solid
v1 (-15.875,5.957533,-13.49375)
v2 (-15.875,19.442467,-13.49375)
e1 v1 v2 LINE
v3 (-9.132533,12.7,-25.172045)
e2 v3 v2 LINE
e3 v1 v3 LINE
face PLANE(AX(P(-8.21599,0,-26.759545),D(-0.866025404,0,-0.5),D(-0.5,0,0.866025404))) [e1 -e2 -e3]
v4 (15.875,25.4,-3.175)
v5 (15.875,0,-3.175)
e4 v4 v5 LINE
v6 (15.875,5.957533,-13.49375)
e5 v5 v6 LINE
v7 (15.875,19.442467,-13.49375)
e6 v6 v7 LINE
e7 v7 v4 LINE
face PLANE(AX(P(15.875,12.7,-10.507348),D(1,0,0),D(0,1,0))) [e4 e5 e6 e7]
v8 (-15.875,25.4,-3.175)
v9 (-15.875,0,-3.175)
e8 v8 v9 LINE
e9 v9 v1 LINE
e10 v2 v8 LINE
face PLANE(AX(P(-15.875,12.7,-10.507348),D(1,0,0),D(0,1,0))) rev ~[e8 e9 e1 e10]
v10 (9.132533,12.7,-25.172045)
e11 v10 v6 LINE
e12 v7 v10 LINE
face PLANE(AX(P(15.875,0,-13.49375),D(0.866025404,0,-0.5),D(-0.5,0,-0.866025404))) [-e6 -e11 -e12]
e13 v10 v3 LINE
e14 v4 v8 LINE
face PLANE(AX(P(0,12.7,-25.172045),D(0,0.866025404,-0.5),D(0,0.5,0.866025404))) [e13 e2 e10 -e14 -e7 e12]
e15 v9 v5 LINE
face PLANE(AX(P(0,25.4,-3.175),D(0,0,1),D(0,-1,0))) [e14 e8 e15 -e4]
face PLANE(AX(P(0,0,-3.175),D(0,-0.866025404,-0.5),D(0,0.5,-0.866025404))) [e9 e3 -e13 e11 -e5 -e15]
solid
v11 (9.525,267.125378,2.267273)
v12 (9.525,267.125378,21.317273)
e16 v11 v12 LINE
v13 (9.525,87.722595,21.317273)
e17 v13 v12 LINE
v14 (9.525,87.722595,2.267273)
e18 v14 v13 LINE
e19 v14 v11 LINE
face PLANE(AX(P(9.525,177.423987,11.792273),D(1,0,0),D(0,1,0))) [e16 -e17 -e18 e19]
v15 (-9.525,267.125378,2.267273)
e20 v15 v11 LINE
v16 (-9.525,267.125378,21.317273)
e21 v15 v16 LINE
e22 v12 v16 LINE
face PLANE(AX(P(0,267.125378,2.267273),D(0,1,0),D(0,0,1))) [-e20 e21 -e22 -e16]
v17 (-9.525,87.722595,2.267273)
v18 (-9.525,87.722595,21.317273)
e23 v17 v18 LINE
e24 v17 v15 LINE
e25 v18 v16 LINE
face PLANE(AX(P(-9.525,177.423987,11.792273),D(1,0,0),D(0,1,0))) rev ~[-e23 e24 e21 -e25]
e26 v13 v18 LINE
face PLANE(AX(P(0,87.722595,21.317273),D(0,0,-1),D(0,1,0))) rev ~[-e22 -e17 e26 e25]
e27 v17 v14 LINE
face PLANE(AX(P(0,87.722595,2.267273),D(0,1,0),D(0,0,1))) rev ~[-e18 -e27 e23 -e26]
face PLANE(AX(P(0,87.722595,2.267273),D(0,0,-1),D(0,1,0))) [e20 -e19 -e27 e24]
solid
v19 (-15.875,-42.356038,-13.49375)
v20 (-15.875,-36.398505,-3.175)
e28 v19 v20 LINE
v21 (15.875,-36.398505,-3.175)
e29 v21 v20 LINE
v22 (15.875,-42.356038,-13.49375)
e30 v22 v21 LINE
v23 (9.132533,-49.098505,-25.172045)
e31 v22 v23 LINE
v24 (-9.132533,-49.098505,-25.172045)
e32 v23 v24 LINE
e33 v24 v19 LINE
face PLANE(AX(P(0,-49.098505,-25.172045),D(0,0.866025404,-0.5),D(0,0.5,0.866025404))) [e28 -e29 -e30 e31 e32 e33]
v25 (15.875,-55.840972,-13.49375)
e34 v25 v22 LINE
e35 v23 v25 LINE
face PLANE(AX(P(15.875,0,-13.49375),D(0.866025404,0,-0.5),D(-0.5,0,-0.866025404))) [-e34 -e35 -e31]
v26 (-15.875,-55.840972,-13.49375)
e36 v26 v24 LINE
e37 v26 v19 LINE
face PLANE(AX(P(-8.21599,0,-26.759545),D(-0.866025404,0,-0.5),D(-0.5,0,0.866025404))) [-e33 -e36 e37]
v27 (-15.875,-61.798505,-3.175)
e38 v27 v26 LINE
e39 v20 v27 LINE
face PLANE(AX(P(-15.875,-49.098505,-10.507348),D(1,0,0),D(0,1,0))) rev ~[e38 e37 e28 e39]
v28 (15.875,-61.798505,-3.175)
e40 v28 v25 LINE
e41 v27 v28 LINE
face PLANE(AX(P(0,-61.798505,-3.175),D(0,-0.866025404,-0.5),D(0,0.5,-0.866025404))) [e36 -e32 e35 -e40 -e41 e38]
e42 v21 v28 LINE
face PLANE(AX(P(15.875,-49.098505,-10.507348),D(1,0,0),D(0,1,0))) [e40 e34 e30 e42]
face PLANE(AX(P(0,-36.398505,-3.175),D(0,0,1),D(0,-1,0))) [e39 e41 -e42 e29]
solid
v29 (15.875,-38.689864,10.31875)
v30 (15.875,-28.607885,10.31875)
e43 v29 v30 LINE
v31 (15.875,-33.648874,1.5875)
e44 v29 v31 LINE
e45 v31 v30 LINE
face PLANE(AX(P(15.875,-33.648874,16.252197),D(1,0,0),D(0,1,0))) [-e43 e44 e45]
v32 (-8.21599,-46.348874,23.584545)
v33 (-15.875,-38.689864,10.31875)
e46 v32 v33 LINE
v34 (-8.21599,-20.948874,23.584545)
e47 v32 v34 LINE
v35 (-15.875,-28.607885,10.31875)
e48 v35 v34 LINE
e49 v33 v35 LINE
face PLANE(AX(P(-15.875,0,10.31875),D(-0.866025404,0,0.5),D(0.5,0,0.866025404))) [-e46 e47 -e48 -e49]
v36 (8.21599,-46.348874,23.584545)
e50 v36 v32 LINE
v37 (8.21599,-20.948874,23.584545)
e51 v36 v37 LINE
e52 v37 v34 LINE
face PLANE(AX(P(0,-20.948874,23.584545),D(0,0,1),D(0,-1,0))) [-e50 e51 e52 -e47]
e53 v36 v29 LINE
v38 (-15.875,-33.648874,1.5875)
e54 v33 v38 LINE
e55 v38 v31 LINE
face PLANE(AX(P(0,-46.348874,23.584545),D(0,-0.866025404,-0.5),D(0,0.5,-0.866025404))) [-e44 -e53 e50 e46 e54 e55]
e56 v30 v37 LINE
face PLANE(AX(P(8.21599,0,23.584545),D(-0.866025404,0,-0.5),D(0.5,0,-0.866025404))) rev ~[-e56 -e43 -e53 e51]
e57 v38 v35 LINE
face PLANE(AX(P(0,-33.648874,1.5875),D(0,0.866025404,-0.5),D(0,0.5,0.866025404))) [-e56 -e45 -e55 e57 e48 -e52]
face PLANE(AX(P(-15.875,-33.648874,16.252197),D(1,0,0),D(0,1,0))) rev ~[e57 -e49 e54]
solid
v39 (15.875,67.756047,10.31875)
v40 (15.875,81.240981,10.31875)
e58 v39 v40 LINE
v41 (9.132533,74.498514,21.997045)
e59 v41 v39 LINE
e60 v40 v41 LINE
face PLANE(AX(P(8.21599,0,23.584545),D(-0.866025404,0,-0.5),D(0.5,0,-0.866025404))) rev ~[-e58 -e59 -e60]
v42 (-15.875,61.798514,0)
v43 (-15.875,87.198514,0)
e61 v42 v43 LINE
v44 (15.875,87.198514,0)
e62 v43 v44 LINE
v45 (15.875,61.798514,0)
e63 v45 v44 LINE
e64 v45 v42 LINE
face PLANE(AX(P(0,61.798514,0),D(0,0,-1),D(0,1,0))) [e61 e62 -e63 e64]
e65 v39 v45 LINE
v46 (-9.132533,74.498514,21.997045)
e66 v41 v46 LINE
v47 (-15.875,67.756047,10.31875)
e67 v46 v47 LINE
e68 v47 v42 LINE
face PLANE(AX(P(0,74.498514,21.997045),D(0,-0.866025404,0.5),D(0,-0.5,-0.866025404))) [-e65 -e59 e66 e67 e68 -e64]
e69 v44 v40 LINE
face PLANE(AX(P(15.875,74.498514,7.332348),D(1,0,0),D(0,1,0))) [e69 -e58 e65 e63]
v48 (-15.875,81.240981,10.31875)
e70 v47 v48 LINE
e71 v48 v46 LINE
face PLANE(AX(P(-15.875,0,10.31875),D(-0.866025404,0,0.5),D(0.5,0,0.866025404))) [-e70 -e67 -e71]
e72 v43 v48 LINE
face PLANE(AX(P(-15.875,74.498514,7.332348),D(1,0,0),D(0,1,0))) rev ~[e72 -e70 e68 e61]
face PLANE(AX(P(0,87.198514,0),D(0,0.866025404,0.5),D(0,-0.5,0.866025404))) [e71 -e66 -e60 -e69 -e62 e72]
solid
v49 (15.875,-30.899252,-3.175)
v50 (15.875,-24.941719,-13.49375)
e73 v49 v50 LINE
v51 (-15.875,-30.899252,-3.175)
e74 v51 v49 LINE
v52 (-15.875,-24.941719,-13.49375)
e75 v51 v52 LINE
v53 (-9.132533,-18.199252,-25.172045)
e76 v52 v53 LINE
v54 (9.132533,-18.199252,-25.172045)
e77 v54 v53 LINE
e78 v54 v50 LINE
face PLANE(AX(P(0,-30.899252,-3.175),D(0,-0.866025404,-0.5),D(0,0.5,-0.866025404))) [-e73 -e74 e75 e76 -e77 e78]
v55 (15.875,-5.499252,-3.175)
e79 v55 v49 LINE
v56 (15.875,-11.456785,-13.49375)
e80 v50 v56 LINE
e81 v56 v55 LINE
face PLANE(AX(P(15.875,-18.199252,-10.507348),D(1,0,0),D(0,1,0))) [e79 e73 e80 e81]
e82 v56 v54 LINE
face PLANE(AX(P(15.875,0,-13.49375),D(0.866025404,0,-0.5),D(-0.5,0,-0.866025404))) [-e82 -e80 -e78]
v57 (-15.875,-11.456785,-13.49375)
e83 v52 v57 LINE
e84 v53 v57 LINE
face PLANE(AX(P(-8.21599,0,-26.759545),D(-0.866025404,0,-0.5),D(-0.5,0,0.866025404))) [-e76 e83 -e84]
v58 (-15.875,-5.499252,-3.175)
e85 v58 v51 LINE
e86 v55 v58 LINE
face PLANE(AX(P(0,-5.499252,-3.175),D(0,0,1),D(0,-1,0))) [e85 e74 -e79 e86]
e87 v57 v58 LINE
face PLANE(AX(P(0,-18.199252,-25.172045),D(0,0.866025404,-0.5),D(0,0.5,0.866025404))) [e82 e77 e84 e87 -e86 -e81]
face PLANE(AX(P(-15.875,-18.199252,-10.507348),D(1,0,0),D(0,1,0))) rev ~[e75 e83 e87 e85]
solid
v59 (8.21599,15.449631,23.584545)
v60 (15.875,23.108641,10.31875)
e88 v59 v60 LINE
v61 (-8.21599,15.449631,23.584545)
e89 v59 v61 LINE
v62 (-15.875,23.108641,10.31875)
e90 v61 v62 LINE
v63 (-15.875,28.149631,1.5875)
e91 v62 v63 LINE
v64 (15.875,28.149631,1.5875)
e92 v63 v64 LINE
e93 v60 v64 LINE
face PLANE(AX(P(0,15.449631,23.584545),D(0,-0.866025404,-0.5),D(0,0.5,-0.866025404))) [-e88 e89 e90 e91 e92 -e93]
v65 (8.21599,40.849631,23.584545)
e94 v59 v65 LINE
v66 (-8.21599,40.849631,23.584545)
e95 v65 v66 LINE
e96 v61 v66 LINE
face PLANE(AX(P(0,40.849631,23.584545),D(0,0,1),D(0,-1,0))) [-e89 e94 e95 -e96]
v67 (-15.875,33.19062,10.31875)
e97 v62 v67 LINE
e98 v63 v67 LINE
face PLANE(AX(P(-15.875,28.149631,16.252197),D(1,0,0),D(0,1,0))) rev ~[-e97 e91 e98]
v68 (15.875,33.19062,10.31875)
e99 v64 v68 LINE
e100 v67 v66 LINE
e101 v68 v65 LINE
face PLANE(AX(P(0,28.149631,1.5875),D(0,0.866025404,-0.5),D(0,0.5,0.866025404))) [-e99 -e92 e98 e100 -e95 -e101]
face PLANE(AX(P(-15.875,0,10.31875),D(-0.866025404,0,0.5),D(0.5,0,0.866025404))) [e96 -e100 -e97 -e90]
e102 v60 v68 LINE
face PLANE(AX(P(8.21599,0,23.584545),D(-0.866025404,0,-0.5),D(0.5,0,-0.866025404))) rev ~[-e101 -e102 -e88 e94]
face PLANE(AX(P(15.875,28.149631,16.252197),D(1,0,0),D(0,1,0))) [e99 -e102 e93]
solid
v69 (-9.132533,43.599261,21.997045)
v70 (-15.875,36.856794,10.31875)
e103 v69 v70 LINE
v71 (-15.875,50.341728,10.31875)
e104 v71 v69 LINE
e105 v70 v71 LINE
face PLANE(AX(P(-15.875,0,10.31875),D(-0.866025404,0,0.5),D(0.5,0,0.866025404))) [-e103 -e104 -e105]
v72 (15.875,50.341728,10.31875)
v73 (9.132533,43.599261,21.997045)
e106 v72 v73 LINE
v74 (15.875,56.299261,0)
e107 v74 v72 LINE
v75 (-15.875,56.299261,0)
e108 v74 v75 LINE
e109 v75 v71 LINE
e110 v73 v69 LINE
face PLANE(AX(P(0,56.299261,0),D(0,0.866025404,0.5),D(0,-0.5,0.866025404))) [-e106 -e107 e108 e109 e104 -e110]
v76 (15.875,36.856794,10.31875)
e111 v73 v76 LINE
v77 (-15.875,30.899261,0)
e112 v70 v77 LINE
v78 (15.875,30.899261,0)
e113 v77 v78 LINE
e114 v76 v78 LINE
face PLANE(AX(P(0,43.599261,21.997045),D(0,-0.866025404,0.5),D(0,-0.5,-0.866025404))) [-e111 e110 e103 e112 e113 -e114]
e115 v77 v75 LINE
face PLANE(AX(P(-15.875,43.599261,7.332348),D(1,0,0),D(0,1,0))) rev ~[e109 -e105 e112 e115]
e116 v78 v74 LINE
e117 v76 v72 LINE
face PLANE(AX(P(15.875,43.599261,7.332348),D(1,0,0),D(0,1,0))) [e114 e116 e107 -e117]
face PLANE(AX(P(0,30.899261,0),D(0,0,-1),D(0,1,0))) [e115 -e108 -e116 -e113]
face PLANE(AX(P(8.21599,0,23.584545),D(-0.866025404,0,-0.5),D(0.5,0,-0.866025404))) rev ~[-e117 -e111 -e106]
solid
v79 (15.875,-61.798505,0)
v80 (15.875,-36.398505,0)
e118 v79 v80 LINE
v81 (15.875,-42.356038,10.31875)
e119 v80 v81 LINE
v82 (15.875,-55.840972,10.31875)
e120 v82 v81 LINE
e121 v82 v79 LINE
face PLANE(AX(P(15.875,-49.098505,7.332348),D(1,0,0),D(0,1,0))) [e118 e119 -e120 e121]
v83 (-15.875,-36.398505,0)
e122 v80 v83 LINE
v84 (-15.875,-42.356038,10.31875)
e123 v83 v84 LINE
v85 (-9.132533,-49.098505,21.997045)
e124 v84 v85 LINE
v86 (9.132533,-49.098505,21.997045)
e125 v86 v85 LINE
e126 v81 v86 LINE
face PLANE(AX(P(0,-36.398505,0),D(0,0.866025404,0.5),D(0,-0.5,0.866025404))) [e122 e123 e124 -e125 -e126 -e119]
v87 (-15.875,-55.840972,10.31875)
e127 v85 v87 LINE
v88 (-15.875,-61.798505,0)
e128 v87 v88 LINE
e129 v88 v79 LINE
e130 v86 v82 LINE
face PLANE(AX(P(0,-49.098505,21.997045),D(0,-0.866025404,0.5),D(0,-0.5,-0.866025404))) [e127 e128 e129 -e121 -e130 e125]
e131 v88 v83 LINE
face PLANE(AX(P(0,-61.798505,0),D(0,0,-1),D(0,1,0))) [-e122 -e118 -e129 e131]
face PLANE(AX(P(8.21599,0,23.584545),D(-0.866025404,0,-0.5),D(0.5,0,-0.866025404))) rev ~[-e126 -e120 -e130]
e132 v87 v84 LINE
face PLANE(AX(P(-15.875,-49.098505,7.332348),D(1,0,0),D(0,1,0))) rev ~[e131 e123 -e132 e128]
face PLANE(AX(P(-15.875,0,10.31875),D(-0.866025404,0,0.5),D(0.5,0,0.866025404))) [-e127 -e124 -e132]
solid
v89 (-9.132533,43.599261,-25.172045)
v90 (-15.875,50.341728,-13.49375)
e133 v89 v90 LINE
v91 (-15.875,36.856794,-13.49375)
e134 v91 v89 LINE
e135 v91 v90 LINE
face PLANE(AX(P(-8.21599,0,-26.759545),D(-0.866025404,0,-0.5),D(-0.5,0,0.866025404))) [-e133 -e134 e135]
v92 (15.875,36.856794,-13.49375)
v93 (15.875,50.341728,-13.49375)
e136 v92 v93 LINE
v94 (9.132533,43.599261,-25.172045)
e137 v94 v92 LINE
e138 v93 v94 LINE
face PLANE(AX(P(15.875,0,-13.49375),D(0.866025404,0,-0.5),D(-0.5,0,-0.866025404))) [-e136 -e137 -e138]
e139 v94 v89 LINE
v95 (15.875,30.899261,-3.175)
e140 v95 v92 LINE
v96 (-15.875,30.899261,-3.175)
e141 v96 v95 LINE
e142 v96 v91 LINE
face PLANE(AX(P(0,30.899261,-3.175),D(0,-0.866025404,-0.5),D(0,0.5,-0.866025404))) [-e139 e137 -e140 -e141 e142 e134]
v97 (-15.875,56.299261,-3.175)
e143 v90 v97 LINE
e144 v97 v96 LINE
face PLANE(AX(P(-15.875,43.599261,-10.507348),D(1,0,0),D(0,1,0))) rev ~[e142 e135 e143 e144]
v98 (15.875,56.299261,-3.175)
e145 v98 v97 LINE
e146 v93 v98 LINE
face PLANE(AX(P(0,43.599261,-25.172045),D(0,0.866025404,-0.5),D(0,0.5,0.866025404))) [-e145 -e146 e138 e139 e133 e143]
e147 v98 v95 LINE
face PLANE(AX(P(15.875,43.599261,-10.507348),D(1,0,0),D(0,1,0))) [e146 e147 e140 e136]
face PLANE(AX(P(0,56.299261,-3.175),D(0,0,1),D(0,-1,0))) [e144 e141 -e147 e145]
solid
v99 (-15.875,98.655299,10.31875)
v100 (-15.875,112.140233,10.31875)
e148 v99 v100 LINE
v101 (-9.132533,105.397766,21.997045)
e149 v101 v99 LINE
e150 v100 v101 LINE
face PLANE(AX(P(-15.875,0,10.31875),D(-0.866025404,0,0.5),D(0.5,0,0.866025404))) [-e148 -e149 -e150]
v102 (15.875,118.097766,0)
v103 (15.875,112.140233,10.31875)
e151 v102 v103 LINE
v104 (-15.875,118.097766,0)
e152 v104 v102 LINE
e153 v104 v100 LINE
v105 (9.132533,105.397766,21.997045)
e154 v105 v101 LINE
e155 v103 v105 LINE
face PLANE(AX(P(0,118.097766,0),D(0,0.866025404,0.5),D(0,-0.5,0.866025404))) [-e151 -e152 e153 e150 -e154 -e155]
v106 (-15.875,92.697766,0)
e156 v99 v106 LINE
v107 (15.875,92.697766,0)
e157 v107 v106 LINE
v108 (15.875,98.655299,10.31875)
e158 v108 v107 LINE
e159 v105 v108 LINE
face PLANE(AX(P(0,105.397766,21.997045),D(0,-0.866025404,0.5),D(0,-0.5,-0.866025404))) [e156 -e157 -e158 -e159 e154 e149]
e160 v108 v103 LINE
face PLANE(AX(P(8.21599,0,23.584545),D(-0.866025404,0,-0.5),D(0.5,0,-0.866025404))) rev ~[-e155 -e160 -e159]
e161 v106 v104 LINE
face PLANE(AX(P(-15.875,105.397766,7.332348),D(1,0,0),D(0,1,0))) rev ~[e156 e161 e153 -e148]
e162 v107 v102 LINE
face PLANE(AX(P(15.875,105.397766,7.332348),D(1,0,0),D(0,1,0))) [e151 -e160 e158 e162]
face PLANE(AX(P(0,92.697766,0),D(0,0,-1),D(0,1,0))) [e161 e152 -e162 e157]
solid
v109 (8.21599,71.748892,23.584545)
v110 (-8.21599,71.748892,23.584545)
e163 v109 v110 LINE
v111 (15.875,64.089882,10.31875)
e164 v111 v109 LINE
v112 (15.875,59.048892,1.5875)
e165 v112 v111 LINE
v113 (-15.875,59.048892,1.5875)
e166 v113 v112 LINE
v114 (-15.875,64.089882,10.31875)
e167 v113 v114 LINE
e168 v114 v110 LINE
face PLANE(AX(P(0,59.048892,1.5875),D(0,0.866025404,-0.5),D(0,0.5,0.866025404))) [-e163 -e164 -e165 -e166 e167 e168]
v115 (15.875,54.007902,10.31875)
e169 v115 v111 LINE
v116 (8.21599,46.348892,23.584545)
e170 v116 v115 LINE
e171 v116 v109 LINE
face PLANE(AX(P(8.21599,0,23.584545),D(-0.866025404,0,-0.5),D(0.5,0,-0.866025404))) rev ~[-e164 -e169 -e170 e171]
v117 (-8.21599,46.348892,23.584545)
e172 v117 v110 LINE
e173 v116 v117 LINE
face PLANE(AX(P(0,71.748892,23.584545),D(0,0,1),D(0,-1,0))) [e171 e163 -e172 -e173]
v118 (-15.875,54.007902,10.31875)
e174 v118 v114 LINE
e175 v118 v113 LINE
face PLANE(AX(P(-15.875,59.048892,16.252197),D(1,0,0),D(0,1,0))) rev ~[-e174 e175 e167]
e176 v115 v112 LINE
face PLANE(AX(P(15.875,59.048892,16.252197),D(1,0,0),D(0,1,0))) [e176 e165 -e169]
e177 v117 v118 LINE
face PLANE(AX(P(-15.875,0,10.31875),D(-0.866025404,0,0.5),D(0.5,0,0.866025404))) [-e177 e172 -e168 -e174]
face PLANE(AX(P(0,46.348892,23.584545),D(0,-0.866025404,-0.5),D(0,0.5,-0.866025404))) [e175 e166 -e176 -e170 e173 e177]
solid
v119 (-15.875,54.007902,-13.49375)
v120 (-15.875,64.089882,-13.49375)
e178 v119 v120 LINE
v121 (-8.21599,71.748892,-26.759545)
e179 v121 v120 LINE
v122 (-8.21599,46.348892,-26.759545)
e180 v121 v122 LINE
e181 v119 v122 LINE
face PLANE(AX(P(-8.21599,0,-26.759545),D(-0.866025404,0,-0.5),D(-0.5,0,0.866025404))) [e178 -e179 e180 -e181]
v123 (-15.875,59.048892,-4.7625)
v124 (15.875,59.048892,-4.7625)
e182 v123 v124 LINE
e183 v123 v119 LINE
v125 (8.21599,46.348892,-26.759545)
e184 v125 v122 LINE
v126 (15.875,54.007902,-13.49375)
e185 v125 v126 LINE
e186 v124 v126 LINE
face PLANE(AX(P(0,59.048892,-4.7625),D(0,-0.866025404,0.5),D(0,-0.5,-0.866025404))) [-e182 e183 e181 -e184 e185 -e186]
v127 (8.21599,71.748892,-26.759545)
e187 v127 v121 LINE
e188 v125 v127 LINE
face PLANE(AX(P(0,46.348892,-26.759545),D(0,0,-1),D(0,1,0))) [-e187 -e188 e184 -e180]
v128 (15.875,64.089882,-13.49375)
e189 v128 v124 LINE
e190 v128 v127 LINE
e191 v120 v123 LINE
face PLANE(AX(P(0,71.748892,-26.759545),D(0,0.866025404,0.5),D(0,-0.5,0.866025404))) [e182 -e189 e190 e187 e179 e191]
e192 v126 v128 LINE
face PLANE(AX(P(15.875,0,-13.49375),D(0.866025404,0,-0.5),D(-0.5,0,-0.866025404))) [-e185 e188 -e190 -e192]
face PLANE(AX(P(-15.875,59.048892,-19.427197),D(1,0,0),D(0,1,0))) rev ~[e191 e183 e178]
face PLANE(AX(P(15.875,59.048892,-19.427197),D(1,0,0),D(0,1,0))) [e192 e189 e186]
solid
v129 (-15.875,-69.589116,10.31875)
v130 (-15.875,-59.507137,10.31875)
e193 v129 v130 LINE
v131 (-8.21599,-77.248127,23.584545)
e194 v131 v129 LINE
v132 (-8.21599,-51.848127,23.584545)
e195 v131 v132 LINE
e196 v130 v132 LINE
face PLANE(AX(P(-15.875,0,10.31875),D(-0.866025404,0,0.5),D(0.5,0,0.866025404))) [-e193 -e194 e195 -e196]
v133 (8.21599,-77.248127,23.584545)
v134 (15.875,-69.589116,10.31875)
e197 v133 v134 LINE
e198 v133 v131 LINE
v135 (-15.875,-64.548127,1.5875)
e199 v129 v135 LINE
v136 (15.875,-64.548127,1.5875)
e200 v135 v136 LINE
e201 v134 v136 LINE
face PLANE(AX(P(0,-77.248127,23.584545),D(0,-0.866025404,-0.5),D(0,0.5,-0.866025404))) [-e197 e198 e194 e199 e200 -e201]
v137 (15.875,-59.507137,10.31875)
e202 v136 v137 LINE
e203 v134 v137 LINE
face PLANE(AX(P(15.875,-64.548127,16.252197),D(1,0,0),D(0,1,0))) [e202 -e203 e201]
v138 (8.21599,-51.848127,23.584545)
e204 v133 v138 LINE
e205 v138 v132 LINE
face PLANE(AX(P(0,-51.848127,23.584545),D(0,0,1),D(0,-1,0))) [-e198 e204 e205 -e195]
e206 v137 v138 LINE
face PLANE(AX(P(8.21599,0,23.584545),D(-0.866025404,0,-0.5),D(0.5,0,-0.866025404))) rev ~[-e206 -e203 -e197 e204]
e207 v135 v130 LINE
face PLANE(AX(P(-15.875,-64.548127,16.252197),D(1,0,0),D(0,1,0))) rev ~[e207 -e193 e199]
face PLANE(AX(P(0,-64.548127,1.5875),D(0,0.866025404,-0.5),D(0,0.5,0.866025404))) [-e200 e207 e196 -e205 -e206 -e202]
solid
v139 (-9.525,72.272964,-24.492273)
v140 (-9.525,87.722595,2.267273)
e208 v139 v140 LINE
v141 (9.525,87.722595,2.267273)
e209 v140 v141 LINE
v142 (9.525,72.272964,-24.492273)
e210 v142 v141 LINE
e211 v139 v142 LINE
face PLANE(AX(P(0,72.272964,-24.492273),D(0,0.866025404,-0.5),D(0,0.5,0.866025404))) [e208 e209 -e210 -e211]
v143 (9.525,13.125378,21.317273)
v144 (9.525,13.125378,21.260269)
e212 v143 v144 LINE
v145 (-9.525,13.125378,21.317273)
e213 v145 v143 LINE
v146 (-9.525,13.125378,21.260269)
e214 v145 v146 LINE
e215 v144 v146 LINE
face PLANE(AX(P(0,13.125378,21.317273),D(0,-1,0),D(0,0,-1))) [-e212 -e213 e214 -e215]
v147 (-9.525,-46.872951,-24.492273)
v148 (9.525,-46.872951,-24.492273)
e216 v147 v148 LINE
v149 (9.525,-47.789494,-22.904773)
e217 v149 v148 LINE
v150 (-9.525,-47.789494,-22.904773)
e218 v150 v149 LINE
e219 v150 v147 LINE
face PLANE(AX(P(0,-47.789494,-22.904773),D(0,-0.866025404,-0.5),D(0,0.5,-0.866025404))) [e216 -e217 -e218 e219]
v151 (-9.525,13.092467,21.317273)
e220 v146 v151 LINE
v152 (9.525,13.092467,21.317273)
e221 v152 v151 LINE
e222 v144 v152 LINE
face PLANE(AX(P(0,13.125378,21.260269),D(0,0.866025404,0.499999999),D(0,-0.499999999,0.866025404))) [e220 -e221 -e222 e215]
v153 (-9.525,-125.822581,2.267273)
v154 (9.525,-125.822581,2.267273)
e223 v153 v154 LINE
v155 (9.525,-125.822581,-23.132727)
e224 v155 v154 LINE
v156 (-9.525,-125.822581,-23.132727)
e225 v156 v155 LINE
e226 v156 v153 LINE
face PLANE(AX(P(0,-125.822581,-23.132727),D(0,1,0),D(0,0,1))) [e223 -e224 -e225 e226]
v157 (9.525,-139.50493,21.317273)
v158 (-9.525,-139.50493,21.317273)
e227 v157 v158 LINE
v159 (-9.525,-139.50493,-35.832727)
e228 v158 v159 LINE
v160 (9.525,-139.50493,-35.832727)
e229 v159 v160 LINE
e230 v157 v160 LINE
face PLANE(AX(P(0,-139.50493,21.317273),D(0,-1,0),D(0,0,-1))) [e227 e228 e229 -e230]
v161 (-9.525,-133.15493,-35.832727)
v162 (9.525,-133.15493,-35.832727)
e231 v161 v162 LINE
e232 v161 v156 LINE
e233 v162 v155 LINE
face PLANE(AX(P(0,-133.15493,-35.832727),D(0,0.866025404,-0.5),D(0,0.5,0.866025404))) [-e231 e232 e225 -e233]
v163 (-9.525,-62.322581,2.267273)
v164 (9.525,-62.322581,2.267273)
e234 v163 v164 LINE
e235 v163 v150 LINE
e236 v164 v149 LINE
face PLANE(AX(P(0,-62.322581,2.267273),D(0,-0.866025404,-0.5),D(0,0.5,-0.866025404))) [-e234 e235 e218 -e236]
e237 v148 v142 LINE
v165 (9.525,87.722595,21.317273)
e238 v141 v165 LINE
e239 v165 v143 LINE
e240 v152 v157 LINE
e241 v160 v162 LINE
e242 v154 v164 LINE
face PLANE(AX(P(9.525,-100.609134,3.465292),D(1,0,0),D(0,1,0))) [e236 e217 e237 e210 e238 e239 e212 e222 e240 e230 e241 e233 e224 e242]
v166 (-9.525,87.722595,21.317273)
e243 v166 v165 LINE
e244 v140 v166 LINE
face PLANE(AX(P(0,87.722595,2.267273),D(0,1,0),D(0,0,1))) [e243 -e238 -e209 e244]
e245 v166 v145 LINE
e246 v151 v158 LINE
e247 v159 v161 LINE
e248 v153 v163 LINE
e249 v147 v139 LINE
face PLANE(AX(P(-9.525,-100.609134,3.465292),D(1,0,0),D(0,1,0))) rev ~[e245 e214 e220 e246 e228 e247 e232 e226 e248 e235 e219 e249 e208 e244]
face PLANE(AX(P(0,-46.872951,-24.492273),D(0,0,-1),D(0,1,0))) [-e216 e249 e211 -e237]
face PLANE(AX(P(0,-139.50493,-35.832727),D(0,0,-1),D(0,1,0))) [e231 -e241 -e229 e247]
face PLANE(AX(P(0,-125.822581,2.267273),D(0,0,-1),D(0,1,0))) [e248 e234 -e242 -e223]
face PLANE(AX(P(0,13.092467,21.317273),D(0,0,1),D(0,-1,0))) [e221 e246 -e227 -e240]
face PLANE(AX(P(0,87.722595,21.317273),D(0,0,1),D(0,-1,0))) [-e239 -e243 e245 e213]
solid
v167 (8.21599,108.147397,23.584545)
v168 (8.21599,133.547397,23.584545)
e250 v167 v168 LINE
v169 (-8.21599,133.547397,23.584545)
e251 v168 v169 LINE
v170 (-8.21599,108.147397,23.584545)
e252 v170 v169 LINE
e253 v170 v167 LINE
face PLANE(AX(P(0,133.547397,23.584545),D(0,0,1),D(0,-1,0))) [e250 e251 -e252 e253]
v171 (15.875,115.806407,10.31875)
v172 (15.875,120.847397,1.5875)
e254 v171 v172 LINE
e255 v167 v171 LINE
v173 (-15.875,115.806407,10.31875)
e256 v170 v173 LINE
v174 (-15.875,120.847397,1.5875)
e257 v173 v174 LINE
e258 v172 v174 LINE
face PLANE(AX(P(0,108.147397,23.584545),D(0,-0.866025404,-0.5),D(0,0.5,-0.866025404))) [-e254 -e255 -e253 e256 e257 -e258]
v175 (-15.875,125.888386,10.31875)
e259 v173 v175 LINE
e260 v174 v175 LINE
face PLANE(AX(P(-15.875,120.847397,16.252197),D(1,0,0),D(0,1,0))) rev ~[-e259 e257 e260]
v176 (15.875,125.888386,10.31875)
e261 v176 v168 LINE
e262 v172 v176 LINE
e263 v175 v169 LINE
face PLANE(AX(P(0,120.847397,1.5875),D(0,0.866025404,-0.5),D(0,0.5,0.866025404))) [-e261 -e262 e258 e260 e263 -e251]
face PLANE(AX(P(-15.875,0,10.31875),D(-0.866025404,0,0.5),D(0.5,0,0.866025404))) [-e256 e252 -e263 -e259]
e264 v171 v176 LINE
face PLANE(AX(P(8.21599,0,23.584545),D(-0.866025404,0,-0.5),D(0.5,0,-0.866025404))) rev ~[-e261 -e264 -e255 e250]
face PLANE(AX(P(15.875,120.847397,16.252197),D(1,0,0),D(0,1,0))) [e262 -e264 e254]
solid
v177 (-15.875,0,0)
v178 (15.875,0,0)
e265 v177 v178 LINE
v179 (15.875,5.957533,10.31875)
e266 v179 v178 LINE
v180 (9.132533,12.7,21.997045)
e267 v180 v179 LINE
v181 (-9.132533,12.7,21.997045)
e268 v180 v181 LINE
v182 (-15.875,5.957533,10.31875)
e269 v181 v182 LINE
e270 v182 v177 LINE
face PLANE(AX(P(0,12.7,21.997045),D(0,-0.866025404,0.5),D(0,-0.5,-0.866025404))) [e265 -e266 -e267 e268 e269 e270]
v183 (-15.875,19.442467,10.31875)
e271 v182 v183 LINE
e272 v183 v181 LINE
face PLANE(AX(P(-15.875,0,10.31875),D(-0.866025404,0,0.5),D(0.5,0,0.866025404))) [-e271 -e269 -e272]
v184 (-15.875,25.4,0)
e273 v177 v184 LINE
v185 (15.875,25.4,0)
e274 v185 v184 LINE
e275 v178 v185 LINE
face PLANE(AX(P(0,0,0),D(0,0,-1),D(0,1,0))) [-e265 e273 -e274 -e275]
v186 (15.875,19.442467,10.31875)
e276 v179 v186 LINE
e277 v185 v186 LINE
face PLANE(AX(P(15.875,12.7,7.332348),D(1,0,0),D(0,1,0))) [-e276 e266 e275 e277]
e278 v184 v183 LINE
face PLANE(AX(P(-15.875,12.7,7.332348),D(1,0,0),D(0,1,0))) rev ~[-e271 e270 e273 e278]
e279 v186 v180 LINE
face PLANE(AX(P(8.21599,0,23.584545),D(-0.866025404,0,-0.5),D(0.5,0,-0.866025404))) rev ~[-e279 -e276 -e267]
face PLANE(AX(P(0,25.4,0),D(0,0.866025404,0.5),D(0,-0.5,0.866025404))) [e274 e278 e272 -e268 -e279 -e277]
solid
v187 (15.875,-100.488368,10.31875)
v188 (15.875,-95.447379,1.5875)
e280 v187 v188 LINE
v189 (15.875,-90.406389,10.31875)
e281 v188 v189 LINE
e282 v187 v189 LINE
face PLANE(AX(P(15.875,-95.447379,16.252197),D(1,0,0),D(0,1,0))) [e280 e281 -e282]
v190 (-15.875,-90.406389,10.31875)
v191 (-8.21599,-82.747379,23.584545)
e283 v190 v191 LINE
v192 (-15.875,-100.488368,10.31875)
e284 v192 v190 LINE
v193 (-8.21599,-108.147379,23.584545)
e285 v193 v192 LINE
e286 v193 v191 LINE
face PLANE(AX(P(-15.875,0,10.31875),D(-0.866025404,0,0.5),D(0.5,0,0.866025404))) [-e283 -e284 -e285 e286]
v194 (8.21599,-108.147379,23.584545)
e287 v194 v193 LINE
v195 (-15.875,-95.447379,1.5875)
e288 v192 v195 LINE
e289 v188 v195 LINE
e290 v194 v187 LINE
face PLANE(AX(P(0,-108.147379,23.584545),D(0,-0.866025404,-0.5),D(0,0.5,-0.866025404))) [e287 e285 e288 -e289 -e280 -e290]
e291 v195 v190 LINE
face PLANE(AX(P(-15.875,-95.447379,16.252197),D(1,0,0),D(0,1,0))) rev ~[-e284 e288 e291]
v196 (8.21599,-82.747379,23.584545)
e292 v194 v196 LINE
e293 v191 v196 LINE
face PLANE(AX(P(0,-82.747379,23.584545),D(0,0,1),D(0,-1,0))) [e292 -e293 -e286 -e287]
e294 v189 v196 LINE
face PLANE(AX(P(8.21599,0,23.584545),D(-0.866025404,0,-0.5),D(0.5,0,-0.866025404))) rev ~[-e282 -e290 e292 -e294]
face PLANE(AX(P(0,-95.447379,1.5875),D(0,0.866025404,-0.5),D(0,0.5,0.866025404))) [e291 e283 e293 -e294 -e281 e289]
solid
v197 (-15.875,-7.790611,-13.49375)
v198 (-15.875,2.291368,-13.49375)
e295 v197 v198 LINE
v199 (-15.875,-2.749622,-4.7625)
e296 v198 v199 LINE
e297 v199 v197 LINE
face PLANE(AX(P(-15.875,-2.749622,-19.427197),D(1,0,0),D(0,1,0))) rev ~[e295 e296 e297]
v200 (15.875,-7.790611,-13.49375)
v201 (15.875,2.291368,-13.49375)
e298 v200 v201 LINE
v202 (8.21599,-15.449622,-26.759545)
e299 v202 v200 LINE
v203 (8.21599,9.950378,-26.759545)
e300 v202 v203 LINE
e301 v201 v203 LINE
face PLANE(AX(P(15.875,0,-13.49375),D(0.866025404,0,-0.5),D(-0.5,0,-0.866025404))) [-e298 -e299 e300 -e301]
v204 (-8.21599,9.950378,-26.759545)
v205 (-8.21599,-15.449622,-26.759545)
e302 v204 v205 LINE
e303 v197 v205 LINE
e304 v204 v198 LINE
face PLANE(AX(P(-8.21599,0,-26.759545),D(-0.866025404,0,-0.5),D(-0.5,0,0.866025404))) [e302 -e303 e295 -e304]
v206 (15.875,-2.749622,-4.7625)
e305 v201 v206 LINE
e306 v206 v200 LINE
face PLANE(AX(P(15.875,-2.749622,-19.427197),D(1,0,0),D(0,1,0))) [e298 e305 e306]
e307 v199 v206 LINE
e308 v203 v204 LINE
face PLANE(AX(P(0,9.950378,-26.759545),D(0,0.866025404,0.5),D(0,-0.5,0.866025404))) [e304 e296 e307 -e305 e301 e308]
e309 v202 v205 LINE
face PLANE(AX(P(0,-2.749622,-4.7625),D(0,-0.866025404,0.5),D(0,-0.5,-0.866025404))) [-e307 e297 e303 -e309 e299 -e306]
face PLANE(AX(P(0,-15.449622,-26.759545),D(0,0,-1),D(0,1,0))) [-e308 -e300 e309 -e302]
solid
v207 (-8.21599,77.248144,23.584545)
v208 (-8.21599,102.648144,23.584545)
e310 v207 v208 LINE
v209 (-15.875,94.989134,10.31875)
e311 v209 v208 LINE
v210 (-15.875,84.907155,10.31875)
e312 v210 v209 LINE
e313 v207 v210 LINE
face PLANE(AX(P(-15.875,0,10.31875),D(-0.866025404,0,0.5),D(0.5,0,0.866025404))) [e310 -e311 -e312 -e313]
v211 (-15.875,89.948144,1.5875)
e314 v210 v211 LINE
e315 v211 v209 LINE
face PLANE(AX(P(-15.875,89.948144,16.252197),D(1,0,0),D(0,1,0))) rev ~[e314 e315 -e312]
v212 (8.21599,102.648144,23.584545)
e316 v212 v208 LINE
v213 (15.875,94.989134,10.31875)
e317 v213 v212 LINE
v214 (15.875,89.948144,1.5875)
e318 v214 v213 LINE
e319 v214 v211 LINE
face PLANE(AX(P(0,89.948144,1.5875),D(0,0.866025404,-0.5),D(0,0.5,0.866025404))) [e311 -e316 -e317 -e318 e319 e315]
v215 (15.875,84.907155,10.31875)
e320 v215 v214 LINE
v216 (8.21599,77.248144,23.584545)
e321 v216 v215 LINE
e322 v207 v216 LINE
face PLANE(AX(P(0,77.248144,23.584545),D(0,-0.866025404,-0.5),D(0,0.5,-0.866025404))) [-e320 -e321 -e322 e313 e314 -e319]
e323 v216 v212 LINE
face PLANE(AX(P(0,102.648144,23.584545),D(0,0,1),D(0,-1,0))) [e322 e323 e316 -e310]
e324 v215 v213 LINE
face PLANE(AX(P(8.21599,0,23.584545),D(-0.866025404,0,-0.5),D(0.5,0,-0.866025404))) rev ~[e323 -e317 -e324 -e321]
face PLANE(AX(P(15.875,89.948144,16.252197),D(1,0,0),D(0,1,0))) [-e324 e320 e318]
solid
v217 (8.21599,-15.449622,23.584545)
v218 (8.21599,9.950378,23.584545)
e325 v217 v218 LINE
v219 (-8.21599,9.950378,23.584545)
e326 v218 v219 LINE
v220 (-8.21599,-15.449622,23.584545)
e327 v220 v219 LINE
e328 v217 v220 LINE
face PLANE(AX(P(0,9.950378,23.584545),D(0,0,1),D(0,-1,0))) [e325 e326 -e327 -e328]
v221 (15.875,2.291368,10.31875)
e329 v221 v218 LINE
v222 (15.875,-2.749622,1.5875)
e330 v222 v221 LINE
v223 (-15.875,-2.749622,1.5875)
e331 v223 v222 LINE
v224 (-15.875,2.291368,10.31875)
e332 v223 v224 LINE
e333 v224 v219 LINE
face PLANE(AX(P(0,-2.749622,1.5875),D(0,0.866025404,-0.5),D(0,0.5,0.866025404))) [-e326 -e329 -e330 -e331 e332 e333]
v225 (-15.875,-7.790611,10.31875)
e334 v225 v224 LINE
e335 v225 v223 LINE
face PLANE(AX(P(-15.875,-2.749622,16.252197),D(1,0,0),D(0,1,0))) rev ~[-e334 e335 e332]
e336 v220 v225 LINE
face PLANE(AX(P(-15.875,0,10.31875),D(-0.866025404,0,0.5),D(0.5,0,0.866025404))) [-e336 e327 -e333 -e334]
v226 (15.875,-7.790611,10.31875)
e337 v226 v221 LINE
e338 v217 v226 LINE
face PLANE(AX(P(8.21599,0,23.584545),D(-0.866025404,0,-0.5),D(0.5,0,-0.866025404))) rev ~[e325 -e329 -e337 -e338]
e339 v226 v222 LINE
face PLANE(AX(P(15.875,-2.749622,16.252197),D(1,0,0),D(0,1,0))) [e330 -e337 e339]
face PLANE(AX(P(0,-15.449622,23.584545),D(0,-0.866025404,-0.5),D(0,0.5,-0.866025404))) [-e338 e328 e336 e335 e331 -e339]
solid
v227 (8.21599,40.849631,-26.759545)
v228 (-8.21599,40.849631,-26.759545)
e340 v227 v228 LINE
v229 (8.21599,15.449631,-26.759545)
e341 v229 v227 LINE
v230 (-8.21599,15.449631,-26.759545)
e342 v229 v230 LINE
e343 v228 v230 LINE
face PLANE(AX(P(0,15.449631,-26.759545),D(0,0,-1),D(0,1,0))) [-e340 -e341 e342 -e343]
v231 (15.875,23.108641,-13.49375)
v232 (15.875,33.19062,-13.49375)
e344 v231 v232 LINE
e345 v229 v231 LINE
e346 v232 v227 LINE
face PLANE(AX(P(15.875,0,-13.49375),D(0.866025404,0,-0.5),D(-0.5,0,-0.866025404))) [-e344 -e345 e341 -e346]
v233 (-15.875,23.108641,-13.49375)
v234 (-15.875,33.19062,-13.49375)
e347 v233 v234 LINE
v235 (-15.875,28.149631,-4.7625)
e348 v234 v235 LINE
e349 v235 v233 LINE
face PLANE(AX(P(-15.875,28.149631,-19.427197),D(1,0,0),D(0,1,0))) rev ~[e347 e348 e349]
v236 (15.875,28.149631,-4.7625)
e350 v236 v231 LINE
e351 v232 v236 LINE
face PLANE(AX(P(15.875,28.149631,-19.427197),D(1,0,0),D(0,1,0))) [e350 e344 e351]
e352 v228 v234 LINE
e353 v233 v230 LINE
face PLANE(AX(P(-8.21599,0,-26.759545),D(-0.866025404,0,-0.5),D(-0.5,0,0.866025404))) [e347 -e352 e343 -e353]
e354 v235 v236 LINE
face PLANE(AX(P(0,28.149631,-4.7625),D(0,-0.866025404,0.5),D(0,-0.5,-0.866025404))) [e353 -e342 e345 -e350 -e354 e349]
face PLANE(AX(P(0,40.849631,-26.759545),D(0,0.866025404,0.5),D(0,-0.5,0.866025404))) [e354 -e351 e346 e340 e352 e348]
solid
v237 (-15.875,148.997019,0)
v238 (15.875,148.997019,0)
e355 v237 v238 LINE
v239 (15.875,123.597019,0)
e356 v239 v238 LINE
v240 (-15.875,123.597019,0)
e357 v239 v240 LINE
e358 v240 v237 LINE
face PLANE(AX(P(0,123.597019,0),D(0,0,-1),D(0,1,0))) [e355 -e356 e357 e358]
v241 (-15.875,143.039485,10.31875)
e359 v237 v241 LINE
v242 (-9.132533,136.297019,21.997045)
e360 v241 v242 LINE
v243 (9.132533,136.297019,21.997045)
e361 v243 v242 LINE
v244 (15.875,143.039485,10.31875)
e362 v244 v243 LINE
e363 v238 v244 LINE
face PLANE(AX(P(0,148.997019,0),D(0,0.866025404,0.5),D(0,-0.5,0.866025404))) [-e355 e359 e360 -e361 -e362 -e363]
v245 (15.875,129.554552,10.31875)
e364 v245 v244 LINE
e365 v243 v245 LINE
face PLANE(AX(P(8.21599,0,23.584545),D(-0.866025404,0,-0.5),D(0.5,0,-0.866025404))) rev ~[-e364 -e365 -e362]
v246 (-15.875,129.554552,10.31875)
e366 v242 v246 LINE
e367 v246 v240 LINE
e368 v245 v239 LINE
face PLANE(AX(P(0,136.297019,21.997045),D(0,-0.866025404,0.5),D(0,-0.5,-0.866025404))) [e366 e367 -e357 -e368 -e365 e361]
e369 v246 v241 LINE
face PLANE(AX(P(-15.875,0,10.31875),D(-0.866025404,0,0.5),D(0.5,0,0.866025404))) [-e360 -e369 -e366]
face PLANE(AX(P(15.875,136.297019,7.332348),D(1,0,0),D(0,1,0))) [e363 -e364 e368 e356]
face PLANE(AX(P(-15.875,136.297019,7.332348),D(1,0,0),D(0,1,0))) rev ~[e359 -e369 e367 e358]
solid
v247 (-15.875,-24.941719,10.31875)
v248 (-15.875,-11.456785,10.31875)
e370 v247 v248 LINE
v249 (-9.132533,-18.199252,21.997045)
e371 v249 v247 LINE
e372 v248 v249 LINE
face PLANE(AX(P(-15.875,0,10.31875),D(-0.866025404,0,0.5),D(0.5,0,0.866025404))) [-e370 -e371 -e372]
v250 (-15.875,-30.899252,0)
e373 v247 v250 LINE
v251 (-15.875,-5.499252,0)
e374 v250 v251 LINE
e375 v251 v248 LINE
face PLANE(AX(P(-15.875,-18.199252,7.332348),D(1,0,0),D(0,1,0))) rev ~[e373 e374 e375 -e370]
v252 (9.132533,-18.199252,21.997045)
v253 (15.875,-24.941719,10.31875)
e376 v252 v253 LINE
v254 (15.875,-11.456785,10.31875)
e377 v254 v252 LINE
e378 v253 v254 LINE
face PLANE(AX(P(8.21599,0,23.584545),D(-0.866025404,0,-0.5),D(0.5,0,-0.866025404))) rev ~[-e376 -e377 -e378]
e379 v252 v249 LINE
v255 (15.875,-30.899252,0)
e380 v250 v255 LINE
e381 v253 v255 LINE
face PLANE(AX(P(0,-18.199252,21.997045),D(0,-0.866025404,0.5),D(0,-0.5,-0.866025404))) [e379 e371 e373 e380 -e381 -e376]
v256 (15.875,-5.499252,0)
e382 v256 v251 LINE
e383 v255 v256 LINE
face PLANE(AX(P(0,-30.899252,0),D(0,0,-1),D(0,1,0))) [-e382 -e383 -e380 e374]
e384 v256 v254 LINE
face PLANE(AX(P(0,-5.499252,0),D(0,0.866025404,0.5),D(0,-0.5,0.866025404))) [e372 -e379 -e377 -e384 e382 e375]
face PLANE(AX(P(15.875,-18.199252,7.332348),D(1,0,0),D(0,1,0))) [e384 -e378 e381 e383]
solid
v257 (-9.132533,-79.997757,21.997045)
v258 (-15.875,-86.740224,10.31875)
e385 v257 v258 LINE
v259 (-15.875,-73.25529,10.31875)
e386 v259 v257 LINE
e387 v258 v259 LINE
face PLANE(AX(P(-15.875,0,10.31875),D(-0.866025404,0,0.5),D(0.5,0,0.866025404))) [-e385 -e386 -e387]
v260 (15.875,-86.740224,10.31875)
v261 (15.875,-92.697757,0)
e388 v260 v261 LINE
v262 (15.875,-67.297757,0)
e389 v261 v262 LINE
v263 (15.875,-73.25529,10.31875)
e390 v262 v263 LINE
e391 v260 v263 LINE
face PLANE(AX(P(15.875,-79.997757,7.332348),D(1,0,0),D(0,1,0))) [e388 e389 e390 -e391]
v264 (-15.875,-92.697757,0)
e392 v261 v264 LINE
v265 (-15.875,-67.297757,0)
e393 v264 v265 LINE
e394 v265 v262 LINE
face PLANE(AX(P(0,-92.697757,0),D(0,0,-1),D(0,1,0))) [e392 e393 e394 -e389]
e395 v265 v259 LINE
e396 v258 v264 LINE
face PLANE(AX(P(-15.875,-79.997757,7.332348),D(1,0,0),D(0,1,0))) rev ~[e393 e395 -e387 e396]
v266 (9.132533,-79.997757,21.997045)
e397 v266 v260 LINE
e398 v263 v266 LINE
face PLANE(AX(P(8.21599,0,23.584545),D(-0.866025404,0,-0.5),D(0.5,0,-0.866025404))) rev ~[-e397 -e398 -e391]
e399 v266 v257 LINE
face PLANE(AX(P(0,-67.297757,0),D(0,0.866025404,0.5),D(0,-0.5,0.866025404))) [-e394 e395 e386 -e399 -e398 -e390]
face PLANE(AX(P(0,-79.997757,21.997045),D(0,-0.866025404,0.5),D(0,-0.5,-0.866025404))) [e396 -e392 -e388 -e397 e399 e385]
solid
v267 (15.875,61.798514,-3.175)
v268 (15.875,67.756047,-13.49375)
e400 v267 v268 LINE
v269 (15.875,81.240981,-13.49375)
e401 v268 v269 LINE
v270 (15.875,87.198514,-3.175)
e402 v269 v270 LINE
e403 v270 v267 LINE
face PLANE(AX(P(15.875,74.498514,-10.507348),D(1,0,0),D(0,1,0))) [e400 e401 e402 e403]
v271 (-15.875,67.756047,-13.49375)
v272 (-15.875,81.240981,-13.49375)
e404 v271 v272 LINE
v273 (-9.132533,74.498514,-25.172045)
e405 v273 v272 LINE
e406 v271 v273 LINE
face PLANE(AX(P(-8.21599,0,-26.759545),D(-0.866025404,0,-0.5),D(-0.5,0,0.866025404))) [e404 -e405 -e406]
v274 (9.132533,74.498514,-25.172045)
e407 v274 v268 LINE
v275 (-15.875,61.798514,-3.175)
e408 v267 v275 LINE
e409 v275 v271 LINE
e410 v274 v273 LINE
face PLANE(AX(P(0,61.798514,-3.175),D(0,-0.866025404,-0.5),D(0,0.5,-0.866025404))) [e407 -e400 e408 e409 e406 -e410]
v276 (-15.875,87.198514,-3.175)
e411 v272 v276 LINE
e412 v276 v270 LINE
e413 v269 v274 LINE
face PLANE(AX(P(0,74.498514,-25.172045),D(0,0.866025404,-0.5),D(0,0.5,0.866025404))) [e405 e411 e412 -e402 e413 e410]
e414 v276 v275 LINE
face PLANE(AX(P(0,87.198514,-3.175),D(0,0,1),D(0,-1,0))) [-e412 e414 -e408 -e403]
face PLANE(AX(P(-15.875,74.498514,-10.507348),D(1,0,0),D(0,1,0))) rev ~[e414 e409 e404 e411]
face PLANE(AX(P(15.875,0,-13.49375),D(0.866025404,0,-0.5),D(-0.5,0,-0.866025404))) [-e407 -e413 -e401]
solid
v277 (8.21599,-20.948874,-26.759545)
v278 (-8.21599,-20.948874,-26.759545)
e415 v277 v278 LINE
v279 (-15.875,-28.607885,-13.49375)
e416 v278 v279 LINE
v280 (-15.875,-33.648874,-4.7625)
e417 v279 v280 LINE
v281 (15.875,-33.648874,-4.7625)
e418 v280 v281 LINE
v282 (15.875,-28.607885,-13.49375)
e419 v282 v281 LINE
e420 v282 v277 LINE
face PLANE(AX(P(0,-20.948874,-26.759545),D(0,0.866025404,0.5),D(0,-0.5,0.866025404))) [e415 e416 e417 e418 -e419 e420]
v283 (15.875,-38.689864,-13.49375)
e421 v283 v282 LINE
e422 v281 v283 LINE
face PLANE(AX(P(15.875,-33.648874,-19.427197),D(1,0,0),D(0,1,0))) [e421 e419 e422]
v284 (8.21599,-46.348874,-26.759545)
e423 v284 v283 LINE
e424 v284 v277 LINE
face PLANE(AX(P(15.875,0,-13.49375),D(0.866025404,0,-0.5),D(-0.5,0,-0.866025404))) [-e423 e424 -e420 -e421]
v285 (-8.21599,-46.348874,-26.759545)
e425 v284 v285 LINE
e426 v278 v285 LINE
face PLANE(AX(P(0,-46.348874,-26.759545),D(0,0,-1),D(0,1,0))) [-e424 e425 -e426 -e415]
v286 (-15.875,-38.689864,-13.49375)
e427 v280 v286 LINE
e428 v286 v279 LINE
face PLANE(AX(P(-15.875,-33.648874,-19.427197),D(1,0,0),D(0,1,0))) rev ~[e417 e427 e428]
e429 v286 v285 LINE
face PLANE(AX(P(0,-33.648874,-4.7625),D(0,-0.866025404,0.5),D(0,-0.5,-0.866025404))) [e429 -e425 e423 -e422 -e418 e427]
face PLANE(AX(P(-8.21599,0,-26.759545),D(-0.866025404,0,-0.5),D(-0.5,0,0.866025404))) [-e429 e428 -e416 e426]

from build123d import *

# Parameters (mm, degrees)
F1_W     = 3.175
F1_H     = 9.525
F2_DEPTH = 9.525
F1_W_2   = 179.4027834434
F1_H_2   = 19.05
F3_DEPTH = 9.525
F4_DEPTH = 15.875
F6_DEPTH = 177.8


with BuildPart() as f2:
    # F1 (on Right) → F2 (new body, symmetric)
    with BuildSketch(Plane.YZ):
        Polygon((-37.7075152621, 2.2672726281), (-48.7060378902, 21.3172726281), (-139.5049298612, 21.3172726281), (-139.5049298612, -35.8327273719), (-133.1549298612, -35.8327273719), (-125.8225814425, -23.1327273719), (-125.8225814425, 2.2672726281), (-62.3225814425, 2.2672726281), align=None)
        Polygon((-29.5902419379, 2.2672726281), (-18.5917193098, 21.3172726281), (-48.7060378902, 21.3172726281), (-37.7075152621, 2.2672726281), align=None)
        Polygon((-6.8082628621, 2.2672726281), (-17.8067854902, 21.3172726281), (-18.5917193098, 21.3172726281), (-29.5902419379, 2.2672726281), align=None)
        Polygon((9.950378257, 17.2345606957), (9.950378257, 21.3172726281), (-17.8067854902, 21.3172726281), (-6.8082628621, 2.2672726281), (1.3090104621, 2.2672726281), align=None)
        Polygon((13.125378257, 21.2602685025), (13.125378257, 11.7922726281), (13.125378257, 2.2672726281), (24.0909895379, 2.2672726281), align=None)
        with Locations((11.537878257, 7.0297726281)):
            Rectangle(F1_W, F1_H)
        Polygon((12.3075330902, 21.3172726281), (9.950378257, 17.2345606957), (9.950378257, 11.7922726281), (13.125378257, 11.7922726281), (13.125378257, 21.2602685025), (13.0924669098, 21.3172726281), align=None)
        Polygon((9.950378257, 11.7922726281), (9.950378257, 17.2345606957), (1.3090104621, 2.2672726281), (9.950378257, 2.2672726281), align=None)
        Polygon((12.3075330902, 21.3172726281), (9.950378257, 21.3172726281), (9.950378257, 17.2345606957), align=None)
        Polygon((13.125378257, 21.3172726281), (13.125378257, 21.2602685025), (24.0909895379, 2.2672726281), (87.7225948136, 2.2672726281), (87.7225948136, 21.3172726281), align=None)
        Polygon((0, 0), (1.3090104621, 2.2672726281), (-6.8082628621, 2.2672726281), (-5.4992524, 0), (-30.8992524, 0), (-29.5902419379, 2.2672726281), (-37.7075152621, 2.2672726281), (-62.3225814425, 2.2672726281), (-51.9763694491, -15.6528922105), (-47.7894943379, -22.9047726281), (-42.7485048, -14.1735226281), (-41.3736894715, -14.9672726281), (-44.8405059529, -24.4922726281), (-34.4873710954, -24.4922726281), (47.6579024332, -24.4922726281), (72.2729641566, -24.4922726281), (87.7225948136, 2.2672726281), (24.0909895379, 2.2672726281), (25.4, 0), (9.950378257, 0), align=None)
        Polygon((13.125378257, 2.2672726281), (9.950378257, 2.2672726281), (9.950378257, 0), (25.4, 0), (24.0909895379, 2.2672726281), align=None)
        Polygon((9.950378257, 2.2672726281), (1.3090104621, 2.2672726281), (0, 0), (9.950378257, 0), align=None)
        Polygon((-5.4992524, 0), (-6.8082628621, 2.2672726281), (-29.5902419379, 2.2672726281), (-30.8992524, 0), align=None)
        Polygon((-42.7485048, -14.1735226281), (-47.7894943379, -22.9047726281), (-46.8729507855, -24.4922726281), (-44.8405059529, -24.4922726281), (-41.3736894715, -14.9672726281), align=None)
    extrude(amount=F2_DEPTH, both=True)


with BuildPart() as f3:
    # F1 (on Right) → F3 (new body, symmetric)
    with BuildSketch(Plane.YZ):
        with Locations((177.4239865353, 11.7922726281)):
            Rectangle(F1_W_2, F1_H_2)
    extrude(amount=F3_DEPTH, both=True)


with BuildPart() as f4:
    # F0 (on Right) → F4 (new body, symmetric)
    with BuildSketch(Plane.YZ):
        Polygon((102.648144371, 23.5845452561), (77.248144371, 23.5845452561), (89.948144371, 1.5875), align=None)
    extrude(amount=F4_DEPTH, both=True)


with BuildPart() as f4b:
    # F0 (on Right) → F4, piece 2 (new body, symmetric)
    with BuildSketch(Plane.YZ):
        Polygon((61.798513714, 0), (87.198513714, 0), (74.498513714, 21.9970452561), align=None)
    extrude(amount=F4_DEPTH, both=True)


with BuildPart() as f4c:
    # F0 (on Right) → F4, piece 3 (new body, symmetric)
    with BuildSketch(Plane.YZ):
        Polygon((74.498513714, -25.1720452561), (87.198513714, -3.175), (61.798513714, -3.175), align=None)
    extrude(amount=F4_DEPTH, both=True)


with BuildPart() as f4d:
    # F0 (on Right) → F4, piece 4 (new body, symmetric)
    with BuildSketch(Plane.YZ):
        Polygon((71.748891971, -26.7595452561), (59.048891971, -4.7625), (46.348891971, -26.7595452561), align=None)
    extrude(amount=F4_DEPTH, both=True)


with BuildPart() as f4e:
    # F0 (on Right) → F4, piece 5 (new body, symmetric)
    with BuildSketch(Plane.YZ):
        Polygon((56.299261314, -3.175), (30.899261314, -3.175), (43.599261314, -25.1720452561), align=None)
    extrude(amount=F4_DEPTH, both=True)


with BuildPart() as f4f:
    # F0 (on Right) → F4, piece 6 (new body, symmetric)
    with BuildSketch(Plane.YZ):
        Polygon((46.348891971, 23.5845452561), (59.048891971, 1.5875), (71.748891971, 23.5845452561), align=None)
    extrude(amount=F4_DEPTH, both=True)


with BuildPart() as f4g:
    # F0 (on Right) → F4, piece 7 (new body, symmetric)
    with BuildSketch(Plane.YZ):
        Polygon((43.599261314, 21.9970452561), (30.899261314, 0), (43.599261314, 0), (56.299261314, 0), align=None)
    extrude(amount=F4_DEPTH, both=True)


with BuildPart() as f4h:
    # F0 (on Right) → F4, piece 8 (new body, symmetric)
    with BuildSketch(Plane.YZ):
        Polygon((40.849630657, -26.7595452561), (28.149630657, -4.7625), (15.449630657, -26.7595452561), align=None)
    extrude(amount=F4_DEPTH, both=True)


with BuildPart() as f4i:
    # F0 (on Right) → F4, piece 9 (new body, symmetric)
    with BuildSketch(Plane.YZ):
        Polygon((15.449630657, 23.5845452561), (28.149630657, 1.5875), (40.849630657, 23.5845452561), align=None)
    extrude(amount=F4_DEPTH, both=True)


with BuildPart() as f4j:
    # F0 (on Right) → F4, piece 10 (new body, symmetric)
    with BuildSketch(Plane.YZ):
        Polygon((12.7, 21.9970452561), (0, 0), (25.4, 0), align=None)
    extrude(amount=F4_DEPTH, both=True)


with BuildPart() as f4k:
    # F0 (on Right) → F4, piece 11 (new body, symmetric)
    with BuildSketch(Plane.YZ):
        Polygon((25.4, -3.175), (0, -3.175), (12.7, -25.1720452561), align=None)
    extrude(amount=F4_DEPTH, both=True)


with BuildPart() as f4l:
    # F0 (on Right) → F4, piece 12 (new body, symmetric)
    with BuildSketch(Plane.YZ):
        Polygon((9.950378257, -26.7595452561), (-2.749621743, -4.7625), (-15.449621743, -26.7595452561), align=None)
    extrude(amount=F4_DEPTH, both=True)


with BuildPart() as f4m:
    # F0 (on Right) → F4, piece 13 (new body, symmetric)
    with BuildSketch(Plane.YZ):
        Polygon((-15.449621743, 23.5845452561), (-2.749621743, 1.5875), (9.950378257, 23.5845452561), align=None)
    extrude(amount=F4_DEPTH, both=True)


with BuildPart() as f4n:
    # F0 (on Right) → F4, piece 14 (new body, symmetric)
    with BuildSketch(Plane.YZ):
        Polygon((-18.1992524, 21.9970452561), (-30.8992524, 0), (-5.4992524, 0), align=None)
    extrude(amount=F4_DEPTH, both=True)


with BuildPart() as f4o:
    # F0 (on Right) → F4, piece 15 (new body, symmetric)
    with BuildSketch(Plane.YZ):
        Polygon((-5.4992524, -3.175), (-30.8992524, -3.175), (-18.1992524, -25.1720452561), align=None)
    extrude(amount=F4_DEPTH, both=True)


with BuildPart() as f4p:
    # F0 (on Right) → F4, piece 16 (new body, symmetric)
    with BuildSketch(Plane.YZ):
        Polygon((-20.948874143, -26.7595452561), (-33.648874143, -4.7625), (-46.348874143, -26.7595452561), align=None)
    extrude(amount=F4_DEPTH, both=True)


with BuildPart() as f4q:
    # F0 (on Right) → F4, piece 17 (new body, symmetric)
    with BuildSketch(Plane.YZ):
        Polygon((-46.348874143, 23.5845452561), (-33.648874143, 1.5875), (-20.948874143, 23.5845452561), align=None)
    extrude(amount=F4_DEPTH, both=True)


with BuildPart() as f4r:
    # F0 (on Right) → F4, piece 18 (new body, symmetric)
    with BuildSketch(Plane.YZ):
        Polygon((-49.0985048, 21.9970452561), (-61.7985048, 0), (-36.3985048, 0), align=None)
    extrude(amount=F4_DEPTH, both=True)


with BuildPart() as f4s:
    # F0 (on Right) → F4, piece 19 (new body, symmetric)
    with BuildSketch(Plane.YZ):
        Polygon((-36.3985048, -3.175), (-61.7985048, -3.175), (-49.0985048, -25.1720452561), align=None)
    extrude(amount=F4_DEPTH, both=True)


with BuildPart() as f4t:
    # F0 (on Right) → F4, piece 20 (new body, symmetric)
    with BuildSketch(Plane.YZ):
        Polygon((-77.248126543, 23.5845452561), (-64.548126543, 1.5875), (-51.848126543, 23.5845452561), align=None)
    extrude(amount=F4_DEPTH, both=True)


with BuildPart() as f4u:
    # F0 (on Right) → F4, piece 21 (new body, symmetric)
    with BuildSketch(Plane.YZ):
        Polygon((-92.6977572, 0), (-67.2977572, 0), (-79.9977572, 21.9970452561), align=None)
    extrude(amount=F4_DEPTH, both=True)


with BuildPart() as f4v:
    # F0 (on Right) → F4, piece 22 (new body, symmetric)
    with BuildSketch(Plane.YZ):
        Polygon((-95.447378943, 1.5875), (-82.747378943, 23.5845452561), (-108.147378943, 23.5845452561), align=None)
    extrude(amount=F4_DEPTH, both=True)


with BuildPart() as f4w:
    # F0 (on Right) → F4, piece 23 (new body, symmetric)
    with BuildSketch(Plane.YZ):
        Polygon((92.697766114, 0), (118.097766114, 0), (105.397766114, 21.9970452561), align=None)
    extrude(amount=F4_DEPTH, both=True)


with BuildPart() as f4x:
    # F0 (on Right) → F4, piece 24 (new body, symmetric)
    with BuildSketch(Plane.YZ):
        Polygon((133.547396771, 23.5845452561), (108.147396771, 23.5845452561), (120.847396771, 1.5875), align=None)
    extrude(amount=F4_DEPTH, both=True)


with BuildPart() as f4y:
    # F0 (on Right) → F4, piece 25 (new body, symmetric)
    with BuildSketch(Plane.YZ):
        Polygon((123.597018514, 0), (148.997018514, 0), (136.297018514, 21.9970452561), align=None)
    extrude(amount=F4_DEPTH, both=True)


with BuildPart() as f6_tool:
    # F5 (on Front) → F6 (new body, symmetric)
    with BuildSketch(Plane.XZ):
        Polygon((8.2159895379, -26.7595452561), (15.875, -26.7595452561), (15.875, -13.49375), (9.525, -24.4922726281), align=None)
        Polygon((-15.875, -26.7595452561), (-8.2159895379, -26.7595452561), (-9.525, -24.4922726281), (-15.875, -13.49375), align=None)
        Polygon((-9.525, 21.3172726281), (-8.2159895379, 23.5845452561), (-15.875, 23.5845452561), (-15.875, 10.31875), align=None)
        Polygon((15.875, 10.31875), (15.875, 23.5845452561), (8.2159895379, 23.5845452561), (9.525, 21.3172726281), align=None)
    extrude(amount=F6_DEPTH, both=True)


with BuildPart() as f4_1:
    add(f4.part)

    # F6: cut by f6_tool
    add(f6_tool.part, mode=Mode.SUBTRACT)


with BuildPart() as f4b_1:
    add(f4b.part)

    # F6: cut by f6_tool
    add(f6_tool.part, mode=Mode.SUBTRACT)


with BuildPart() as f4c_1:
    add(f4c.part)

    # F6: cut by f6_tool
    add(f6_tool.part, mode=Mode.SUBTRACT)


with BuildPart() as f4d_1:
    add(f4d.part)

    # F6: cut by f6_tool
    add(f6_tool.part, mode=Mode.SUBTRACT)


with BuildPart() as f4e_1:
    add(f4e.part)

    # F6: cut by f6_tool
    add(f6_tool.part, mode=Mode.SUBTRACT)


with BuildPart() as f4f_1:
    add(f4f.part)

    # F6: cut by f6_tool
    add(f6_tool.part, mode=Mode.SUBTRACT)


with BuildPart() as f4g_1:
    add(f4g.part)

    # F6: cut by f6_tool
    add(f6_tool.part, mode=Mode.SUBTRACT)


with BuildPart() as f4h_1:
    add(f4h.part)

    # F6: cut by f6_tool
    add(f6_tool.part, mode=Mode.SUBTRACT)


with BuildPart() as f4i_1:
    add(f4i.part)

    # F6: cut by f6_tool
    add(f6_tool.part, mode=Mode.SUBTRACT)


with BuildPart() as f4j_1:
    add(f4j.part)

    # F6: cut by f6_tool
    add(f6_tool.part, mode=Mode.SUBTRACT)


with BuildPart() as f4k_1:
    add(f4k.part)

    # F6: cut by f6_tool
    add(f6_tool.part, mode=Mode.SUBTRACT)


with BuildPart() as f4l_1:
    add(f4l.part)

    # F6: cut by f6_tool
    add(f6_tool.part, mode=Mode.SUBTRACT)


with BuildPart() as f4m_1:
    add(f4m.part)

    # F6: cut by f6_tool
    add(f6_tool.part, mode=Mode.SUBTRACT)


with BuildPart() as f4n_1:
    add(f4n.part)

    # F6: cut by f6_tool
    add(f6_tool.part, mode=Mode.SUBTRACT)


with BuildPart() as f4o_1:
    add(f4o.part)

    # F6: cut by f6_tool
    add(f6_tool.part, mode=Mode.SUBTRACT)


with BuildPart() as f4p_1:
    add(f4p.part)

    # F6: cut by f6_tool
    add(f6_tool.part, mode=Mode.SUBTRACT)


with BuildPart() as f4q_1:
    add(f4q.part)

    # F6: cut by f6_tool
    add(f6_tool.part, mode=Mode.SUBTRACT)


with BuildPart() as f4r_1:
    add(f4r.part)

    # F6: cut by f6_tool
    add(f6_tool.part, mode=Mode.SUBTRACT)


with BuildPart() as f4s_1:
    add(f4s.part)

    # F6: cut by f6_tool
    add(f6_tool.part, mode=Mode.SUBTRACT)


with BuildPart() as f4t_1:
    add(f4t.part)

    # F6: cut by f6_tool
    add(f6_tool.part, mode=Mode.SUBTRACT)


with BuildPart() as f4u_1:
    add(f4u.part)

    # F6: cut by f6_tool
    add(f6_tool.part, mode=Mode.SUBTRACT)


with BuildPart() as f4v_1:
    add(f4v.part)

    # F6: cut by f6_tool
    add(f6_tool.part, mode=Mode.SUBTRACT)


with BuildPart() as f4w_1:
    add(f4w.part)

    # F6: cut by f6_tool
    add(f6_tool.part, mode=Mode.SUBTRACT)


with BuildPart() as f4x_1:
    add(f4x.part)

    # F6: cut by f6_tool
    add(f6_tool.part, mode=Mode.SUBTRACT)


with BuildPart() as f4y_1:
    add(f4y.part)

    # F6: cut by f6_tool
    add(f6_tool.part, mode=Mode.SUBTRACT)


solid = Compound([f2.part, f3.part, f4_1.part, f4b_1.part, f4c_1.part, f4d_1.part, f4e_1.part, f4f_1.part, f4g_1.part, f4h_1.part, f4i_1.part, f4j_1.part, f4k_1.part, f4l_1.part, f4m_1.part, f4n_1.part, f4o_1.part, f4p_1.part, f4q_1.part, f4r_1.part, f4s_1.part, f4t_1.part, f4u_1.part, f4v_1.part, f4w_1.part, f4x_1.part, f4y_1.part])
